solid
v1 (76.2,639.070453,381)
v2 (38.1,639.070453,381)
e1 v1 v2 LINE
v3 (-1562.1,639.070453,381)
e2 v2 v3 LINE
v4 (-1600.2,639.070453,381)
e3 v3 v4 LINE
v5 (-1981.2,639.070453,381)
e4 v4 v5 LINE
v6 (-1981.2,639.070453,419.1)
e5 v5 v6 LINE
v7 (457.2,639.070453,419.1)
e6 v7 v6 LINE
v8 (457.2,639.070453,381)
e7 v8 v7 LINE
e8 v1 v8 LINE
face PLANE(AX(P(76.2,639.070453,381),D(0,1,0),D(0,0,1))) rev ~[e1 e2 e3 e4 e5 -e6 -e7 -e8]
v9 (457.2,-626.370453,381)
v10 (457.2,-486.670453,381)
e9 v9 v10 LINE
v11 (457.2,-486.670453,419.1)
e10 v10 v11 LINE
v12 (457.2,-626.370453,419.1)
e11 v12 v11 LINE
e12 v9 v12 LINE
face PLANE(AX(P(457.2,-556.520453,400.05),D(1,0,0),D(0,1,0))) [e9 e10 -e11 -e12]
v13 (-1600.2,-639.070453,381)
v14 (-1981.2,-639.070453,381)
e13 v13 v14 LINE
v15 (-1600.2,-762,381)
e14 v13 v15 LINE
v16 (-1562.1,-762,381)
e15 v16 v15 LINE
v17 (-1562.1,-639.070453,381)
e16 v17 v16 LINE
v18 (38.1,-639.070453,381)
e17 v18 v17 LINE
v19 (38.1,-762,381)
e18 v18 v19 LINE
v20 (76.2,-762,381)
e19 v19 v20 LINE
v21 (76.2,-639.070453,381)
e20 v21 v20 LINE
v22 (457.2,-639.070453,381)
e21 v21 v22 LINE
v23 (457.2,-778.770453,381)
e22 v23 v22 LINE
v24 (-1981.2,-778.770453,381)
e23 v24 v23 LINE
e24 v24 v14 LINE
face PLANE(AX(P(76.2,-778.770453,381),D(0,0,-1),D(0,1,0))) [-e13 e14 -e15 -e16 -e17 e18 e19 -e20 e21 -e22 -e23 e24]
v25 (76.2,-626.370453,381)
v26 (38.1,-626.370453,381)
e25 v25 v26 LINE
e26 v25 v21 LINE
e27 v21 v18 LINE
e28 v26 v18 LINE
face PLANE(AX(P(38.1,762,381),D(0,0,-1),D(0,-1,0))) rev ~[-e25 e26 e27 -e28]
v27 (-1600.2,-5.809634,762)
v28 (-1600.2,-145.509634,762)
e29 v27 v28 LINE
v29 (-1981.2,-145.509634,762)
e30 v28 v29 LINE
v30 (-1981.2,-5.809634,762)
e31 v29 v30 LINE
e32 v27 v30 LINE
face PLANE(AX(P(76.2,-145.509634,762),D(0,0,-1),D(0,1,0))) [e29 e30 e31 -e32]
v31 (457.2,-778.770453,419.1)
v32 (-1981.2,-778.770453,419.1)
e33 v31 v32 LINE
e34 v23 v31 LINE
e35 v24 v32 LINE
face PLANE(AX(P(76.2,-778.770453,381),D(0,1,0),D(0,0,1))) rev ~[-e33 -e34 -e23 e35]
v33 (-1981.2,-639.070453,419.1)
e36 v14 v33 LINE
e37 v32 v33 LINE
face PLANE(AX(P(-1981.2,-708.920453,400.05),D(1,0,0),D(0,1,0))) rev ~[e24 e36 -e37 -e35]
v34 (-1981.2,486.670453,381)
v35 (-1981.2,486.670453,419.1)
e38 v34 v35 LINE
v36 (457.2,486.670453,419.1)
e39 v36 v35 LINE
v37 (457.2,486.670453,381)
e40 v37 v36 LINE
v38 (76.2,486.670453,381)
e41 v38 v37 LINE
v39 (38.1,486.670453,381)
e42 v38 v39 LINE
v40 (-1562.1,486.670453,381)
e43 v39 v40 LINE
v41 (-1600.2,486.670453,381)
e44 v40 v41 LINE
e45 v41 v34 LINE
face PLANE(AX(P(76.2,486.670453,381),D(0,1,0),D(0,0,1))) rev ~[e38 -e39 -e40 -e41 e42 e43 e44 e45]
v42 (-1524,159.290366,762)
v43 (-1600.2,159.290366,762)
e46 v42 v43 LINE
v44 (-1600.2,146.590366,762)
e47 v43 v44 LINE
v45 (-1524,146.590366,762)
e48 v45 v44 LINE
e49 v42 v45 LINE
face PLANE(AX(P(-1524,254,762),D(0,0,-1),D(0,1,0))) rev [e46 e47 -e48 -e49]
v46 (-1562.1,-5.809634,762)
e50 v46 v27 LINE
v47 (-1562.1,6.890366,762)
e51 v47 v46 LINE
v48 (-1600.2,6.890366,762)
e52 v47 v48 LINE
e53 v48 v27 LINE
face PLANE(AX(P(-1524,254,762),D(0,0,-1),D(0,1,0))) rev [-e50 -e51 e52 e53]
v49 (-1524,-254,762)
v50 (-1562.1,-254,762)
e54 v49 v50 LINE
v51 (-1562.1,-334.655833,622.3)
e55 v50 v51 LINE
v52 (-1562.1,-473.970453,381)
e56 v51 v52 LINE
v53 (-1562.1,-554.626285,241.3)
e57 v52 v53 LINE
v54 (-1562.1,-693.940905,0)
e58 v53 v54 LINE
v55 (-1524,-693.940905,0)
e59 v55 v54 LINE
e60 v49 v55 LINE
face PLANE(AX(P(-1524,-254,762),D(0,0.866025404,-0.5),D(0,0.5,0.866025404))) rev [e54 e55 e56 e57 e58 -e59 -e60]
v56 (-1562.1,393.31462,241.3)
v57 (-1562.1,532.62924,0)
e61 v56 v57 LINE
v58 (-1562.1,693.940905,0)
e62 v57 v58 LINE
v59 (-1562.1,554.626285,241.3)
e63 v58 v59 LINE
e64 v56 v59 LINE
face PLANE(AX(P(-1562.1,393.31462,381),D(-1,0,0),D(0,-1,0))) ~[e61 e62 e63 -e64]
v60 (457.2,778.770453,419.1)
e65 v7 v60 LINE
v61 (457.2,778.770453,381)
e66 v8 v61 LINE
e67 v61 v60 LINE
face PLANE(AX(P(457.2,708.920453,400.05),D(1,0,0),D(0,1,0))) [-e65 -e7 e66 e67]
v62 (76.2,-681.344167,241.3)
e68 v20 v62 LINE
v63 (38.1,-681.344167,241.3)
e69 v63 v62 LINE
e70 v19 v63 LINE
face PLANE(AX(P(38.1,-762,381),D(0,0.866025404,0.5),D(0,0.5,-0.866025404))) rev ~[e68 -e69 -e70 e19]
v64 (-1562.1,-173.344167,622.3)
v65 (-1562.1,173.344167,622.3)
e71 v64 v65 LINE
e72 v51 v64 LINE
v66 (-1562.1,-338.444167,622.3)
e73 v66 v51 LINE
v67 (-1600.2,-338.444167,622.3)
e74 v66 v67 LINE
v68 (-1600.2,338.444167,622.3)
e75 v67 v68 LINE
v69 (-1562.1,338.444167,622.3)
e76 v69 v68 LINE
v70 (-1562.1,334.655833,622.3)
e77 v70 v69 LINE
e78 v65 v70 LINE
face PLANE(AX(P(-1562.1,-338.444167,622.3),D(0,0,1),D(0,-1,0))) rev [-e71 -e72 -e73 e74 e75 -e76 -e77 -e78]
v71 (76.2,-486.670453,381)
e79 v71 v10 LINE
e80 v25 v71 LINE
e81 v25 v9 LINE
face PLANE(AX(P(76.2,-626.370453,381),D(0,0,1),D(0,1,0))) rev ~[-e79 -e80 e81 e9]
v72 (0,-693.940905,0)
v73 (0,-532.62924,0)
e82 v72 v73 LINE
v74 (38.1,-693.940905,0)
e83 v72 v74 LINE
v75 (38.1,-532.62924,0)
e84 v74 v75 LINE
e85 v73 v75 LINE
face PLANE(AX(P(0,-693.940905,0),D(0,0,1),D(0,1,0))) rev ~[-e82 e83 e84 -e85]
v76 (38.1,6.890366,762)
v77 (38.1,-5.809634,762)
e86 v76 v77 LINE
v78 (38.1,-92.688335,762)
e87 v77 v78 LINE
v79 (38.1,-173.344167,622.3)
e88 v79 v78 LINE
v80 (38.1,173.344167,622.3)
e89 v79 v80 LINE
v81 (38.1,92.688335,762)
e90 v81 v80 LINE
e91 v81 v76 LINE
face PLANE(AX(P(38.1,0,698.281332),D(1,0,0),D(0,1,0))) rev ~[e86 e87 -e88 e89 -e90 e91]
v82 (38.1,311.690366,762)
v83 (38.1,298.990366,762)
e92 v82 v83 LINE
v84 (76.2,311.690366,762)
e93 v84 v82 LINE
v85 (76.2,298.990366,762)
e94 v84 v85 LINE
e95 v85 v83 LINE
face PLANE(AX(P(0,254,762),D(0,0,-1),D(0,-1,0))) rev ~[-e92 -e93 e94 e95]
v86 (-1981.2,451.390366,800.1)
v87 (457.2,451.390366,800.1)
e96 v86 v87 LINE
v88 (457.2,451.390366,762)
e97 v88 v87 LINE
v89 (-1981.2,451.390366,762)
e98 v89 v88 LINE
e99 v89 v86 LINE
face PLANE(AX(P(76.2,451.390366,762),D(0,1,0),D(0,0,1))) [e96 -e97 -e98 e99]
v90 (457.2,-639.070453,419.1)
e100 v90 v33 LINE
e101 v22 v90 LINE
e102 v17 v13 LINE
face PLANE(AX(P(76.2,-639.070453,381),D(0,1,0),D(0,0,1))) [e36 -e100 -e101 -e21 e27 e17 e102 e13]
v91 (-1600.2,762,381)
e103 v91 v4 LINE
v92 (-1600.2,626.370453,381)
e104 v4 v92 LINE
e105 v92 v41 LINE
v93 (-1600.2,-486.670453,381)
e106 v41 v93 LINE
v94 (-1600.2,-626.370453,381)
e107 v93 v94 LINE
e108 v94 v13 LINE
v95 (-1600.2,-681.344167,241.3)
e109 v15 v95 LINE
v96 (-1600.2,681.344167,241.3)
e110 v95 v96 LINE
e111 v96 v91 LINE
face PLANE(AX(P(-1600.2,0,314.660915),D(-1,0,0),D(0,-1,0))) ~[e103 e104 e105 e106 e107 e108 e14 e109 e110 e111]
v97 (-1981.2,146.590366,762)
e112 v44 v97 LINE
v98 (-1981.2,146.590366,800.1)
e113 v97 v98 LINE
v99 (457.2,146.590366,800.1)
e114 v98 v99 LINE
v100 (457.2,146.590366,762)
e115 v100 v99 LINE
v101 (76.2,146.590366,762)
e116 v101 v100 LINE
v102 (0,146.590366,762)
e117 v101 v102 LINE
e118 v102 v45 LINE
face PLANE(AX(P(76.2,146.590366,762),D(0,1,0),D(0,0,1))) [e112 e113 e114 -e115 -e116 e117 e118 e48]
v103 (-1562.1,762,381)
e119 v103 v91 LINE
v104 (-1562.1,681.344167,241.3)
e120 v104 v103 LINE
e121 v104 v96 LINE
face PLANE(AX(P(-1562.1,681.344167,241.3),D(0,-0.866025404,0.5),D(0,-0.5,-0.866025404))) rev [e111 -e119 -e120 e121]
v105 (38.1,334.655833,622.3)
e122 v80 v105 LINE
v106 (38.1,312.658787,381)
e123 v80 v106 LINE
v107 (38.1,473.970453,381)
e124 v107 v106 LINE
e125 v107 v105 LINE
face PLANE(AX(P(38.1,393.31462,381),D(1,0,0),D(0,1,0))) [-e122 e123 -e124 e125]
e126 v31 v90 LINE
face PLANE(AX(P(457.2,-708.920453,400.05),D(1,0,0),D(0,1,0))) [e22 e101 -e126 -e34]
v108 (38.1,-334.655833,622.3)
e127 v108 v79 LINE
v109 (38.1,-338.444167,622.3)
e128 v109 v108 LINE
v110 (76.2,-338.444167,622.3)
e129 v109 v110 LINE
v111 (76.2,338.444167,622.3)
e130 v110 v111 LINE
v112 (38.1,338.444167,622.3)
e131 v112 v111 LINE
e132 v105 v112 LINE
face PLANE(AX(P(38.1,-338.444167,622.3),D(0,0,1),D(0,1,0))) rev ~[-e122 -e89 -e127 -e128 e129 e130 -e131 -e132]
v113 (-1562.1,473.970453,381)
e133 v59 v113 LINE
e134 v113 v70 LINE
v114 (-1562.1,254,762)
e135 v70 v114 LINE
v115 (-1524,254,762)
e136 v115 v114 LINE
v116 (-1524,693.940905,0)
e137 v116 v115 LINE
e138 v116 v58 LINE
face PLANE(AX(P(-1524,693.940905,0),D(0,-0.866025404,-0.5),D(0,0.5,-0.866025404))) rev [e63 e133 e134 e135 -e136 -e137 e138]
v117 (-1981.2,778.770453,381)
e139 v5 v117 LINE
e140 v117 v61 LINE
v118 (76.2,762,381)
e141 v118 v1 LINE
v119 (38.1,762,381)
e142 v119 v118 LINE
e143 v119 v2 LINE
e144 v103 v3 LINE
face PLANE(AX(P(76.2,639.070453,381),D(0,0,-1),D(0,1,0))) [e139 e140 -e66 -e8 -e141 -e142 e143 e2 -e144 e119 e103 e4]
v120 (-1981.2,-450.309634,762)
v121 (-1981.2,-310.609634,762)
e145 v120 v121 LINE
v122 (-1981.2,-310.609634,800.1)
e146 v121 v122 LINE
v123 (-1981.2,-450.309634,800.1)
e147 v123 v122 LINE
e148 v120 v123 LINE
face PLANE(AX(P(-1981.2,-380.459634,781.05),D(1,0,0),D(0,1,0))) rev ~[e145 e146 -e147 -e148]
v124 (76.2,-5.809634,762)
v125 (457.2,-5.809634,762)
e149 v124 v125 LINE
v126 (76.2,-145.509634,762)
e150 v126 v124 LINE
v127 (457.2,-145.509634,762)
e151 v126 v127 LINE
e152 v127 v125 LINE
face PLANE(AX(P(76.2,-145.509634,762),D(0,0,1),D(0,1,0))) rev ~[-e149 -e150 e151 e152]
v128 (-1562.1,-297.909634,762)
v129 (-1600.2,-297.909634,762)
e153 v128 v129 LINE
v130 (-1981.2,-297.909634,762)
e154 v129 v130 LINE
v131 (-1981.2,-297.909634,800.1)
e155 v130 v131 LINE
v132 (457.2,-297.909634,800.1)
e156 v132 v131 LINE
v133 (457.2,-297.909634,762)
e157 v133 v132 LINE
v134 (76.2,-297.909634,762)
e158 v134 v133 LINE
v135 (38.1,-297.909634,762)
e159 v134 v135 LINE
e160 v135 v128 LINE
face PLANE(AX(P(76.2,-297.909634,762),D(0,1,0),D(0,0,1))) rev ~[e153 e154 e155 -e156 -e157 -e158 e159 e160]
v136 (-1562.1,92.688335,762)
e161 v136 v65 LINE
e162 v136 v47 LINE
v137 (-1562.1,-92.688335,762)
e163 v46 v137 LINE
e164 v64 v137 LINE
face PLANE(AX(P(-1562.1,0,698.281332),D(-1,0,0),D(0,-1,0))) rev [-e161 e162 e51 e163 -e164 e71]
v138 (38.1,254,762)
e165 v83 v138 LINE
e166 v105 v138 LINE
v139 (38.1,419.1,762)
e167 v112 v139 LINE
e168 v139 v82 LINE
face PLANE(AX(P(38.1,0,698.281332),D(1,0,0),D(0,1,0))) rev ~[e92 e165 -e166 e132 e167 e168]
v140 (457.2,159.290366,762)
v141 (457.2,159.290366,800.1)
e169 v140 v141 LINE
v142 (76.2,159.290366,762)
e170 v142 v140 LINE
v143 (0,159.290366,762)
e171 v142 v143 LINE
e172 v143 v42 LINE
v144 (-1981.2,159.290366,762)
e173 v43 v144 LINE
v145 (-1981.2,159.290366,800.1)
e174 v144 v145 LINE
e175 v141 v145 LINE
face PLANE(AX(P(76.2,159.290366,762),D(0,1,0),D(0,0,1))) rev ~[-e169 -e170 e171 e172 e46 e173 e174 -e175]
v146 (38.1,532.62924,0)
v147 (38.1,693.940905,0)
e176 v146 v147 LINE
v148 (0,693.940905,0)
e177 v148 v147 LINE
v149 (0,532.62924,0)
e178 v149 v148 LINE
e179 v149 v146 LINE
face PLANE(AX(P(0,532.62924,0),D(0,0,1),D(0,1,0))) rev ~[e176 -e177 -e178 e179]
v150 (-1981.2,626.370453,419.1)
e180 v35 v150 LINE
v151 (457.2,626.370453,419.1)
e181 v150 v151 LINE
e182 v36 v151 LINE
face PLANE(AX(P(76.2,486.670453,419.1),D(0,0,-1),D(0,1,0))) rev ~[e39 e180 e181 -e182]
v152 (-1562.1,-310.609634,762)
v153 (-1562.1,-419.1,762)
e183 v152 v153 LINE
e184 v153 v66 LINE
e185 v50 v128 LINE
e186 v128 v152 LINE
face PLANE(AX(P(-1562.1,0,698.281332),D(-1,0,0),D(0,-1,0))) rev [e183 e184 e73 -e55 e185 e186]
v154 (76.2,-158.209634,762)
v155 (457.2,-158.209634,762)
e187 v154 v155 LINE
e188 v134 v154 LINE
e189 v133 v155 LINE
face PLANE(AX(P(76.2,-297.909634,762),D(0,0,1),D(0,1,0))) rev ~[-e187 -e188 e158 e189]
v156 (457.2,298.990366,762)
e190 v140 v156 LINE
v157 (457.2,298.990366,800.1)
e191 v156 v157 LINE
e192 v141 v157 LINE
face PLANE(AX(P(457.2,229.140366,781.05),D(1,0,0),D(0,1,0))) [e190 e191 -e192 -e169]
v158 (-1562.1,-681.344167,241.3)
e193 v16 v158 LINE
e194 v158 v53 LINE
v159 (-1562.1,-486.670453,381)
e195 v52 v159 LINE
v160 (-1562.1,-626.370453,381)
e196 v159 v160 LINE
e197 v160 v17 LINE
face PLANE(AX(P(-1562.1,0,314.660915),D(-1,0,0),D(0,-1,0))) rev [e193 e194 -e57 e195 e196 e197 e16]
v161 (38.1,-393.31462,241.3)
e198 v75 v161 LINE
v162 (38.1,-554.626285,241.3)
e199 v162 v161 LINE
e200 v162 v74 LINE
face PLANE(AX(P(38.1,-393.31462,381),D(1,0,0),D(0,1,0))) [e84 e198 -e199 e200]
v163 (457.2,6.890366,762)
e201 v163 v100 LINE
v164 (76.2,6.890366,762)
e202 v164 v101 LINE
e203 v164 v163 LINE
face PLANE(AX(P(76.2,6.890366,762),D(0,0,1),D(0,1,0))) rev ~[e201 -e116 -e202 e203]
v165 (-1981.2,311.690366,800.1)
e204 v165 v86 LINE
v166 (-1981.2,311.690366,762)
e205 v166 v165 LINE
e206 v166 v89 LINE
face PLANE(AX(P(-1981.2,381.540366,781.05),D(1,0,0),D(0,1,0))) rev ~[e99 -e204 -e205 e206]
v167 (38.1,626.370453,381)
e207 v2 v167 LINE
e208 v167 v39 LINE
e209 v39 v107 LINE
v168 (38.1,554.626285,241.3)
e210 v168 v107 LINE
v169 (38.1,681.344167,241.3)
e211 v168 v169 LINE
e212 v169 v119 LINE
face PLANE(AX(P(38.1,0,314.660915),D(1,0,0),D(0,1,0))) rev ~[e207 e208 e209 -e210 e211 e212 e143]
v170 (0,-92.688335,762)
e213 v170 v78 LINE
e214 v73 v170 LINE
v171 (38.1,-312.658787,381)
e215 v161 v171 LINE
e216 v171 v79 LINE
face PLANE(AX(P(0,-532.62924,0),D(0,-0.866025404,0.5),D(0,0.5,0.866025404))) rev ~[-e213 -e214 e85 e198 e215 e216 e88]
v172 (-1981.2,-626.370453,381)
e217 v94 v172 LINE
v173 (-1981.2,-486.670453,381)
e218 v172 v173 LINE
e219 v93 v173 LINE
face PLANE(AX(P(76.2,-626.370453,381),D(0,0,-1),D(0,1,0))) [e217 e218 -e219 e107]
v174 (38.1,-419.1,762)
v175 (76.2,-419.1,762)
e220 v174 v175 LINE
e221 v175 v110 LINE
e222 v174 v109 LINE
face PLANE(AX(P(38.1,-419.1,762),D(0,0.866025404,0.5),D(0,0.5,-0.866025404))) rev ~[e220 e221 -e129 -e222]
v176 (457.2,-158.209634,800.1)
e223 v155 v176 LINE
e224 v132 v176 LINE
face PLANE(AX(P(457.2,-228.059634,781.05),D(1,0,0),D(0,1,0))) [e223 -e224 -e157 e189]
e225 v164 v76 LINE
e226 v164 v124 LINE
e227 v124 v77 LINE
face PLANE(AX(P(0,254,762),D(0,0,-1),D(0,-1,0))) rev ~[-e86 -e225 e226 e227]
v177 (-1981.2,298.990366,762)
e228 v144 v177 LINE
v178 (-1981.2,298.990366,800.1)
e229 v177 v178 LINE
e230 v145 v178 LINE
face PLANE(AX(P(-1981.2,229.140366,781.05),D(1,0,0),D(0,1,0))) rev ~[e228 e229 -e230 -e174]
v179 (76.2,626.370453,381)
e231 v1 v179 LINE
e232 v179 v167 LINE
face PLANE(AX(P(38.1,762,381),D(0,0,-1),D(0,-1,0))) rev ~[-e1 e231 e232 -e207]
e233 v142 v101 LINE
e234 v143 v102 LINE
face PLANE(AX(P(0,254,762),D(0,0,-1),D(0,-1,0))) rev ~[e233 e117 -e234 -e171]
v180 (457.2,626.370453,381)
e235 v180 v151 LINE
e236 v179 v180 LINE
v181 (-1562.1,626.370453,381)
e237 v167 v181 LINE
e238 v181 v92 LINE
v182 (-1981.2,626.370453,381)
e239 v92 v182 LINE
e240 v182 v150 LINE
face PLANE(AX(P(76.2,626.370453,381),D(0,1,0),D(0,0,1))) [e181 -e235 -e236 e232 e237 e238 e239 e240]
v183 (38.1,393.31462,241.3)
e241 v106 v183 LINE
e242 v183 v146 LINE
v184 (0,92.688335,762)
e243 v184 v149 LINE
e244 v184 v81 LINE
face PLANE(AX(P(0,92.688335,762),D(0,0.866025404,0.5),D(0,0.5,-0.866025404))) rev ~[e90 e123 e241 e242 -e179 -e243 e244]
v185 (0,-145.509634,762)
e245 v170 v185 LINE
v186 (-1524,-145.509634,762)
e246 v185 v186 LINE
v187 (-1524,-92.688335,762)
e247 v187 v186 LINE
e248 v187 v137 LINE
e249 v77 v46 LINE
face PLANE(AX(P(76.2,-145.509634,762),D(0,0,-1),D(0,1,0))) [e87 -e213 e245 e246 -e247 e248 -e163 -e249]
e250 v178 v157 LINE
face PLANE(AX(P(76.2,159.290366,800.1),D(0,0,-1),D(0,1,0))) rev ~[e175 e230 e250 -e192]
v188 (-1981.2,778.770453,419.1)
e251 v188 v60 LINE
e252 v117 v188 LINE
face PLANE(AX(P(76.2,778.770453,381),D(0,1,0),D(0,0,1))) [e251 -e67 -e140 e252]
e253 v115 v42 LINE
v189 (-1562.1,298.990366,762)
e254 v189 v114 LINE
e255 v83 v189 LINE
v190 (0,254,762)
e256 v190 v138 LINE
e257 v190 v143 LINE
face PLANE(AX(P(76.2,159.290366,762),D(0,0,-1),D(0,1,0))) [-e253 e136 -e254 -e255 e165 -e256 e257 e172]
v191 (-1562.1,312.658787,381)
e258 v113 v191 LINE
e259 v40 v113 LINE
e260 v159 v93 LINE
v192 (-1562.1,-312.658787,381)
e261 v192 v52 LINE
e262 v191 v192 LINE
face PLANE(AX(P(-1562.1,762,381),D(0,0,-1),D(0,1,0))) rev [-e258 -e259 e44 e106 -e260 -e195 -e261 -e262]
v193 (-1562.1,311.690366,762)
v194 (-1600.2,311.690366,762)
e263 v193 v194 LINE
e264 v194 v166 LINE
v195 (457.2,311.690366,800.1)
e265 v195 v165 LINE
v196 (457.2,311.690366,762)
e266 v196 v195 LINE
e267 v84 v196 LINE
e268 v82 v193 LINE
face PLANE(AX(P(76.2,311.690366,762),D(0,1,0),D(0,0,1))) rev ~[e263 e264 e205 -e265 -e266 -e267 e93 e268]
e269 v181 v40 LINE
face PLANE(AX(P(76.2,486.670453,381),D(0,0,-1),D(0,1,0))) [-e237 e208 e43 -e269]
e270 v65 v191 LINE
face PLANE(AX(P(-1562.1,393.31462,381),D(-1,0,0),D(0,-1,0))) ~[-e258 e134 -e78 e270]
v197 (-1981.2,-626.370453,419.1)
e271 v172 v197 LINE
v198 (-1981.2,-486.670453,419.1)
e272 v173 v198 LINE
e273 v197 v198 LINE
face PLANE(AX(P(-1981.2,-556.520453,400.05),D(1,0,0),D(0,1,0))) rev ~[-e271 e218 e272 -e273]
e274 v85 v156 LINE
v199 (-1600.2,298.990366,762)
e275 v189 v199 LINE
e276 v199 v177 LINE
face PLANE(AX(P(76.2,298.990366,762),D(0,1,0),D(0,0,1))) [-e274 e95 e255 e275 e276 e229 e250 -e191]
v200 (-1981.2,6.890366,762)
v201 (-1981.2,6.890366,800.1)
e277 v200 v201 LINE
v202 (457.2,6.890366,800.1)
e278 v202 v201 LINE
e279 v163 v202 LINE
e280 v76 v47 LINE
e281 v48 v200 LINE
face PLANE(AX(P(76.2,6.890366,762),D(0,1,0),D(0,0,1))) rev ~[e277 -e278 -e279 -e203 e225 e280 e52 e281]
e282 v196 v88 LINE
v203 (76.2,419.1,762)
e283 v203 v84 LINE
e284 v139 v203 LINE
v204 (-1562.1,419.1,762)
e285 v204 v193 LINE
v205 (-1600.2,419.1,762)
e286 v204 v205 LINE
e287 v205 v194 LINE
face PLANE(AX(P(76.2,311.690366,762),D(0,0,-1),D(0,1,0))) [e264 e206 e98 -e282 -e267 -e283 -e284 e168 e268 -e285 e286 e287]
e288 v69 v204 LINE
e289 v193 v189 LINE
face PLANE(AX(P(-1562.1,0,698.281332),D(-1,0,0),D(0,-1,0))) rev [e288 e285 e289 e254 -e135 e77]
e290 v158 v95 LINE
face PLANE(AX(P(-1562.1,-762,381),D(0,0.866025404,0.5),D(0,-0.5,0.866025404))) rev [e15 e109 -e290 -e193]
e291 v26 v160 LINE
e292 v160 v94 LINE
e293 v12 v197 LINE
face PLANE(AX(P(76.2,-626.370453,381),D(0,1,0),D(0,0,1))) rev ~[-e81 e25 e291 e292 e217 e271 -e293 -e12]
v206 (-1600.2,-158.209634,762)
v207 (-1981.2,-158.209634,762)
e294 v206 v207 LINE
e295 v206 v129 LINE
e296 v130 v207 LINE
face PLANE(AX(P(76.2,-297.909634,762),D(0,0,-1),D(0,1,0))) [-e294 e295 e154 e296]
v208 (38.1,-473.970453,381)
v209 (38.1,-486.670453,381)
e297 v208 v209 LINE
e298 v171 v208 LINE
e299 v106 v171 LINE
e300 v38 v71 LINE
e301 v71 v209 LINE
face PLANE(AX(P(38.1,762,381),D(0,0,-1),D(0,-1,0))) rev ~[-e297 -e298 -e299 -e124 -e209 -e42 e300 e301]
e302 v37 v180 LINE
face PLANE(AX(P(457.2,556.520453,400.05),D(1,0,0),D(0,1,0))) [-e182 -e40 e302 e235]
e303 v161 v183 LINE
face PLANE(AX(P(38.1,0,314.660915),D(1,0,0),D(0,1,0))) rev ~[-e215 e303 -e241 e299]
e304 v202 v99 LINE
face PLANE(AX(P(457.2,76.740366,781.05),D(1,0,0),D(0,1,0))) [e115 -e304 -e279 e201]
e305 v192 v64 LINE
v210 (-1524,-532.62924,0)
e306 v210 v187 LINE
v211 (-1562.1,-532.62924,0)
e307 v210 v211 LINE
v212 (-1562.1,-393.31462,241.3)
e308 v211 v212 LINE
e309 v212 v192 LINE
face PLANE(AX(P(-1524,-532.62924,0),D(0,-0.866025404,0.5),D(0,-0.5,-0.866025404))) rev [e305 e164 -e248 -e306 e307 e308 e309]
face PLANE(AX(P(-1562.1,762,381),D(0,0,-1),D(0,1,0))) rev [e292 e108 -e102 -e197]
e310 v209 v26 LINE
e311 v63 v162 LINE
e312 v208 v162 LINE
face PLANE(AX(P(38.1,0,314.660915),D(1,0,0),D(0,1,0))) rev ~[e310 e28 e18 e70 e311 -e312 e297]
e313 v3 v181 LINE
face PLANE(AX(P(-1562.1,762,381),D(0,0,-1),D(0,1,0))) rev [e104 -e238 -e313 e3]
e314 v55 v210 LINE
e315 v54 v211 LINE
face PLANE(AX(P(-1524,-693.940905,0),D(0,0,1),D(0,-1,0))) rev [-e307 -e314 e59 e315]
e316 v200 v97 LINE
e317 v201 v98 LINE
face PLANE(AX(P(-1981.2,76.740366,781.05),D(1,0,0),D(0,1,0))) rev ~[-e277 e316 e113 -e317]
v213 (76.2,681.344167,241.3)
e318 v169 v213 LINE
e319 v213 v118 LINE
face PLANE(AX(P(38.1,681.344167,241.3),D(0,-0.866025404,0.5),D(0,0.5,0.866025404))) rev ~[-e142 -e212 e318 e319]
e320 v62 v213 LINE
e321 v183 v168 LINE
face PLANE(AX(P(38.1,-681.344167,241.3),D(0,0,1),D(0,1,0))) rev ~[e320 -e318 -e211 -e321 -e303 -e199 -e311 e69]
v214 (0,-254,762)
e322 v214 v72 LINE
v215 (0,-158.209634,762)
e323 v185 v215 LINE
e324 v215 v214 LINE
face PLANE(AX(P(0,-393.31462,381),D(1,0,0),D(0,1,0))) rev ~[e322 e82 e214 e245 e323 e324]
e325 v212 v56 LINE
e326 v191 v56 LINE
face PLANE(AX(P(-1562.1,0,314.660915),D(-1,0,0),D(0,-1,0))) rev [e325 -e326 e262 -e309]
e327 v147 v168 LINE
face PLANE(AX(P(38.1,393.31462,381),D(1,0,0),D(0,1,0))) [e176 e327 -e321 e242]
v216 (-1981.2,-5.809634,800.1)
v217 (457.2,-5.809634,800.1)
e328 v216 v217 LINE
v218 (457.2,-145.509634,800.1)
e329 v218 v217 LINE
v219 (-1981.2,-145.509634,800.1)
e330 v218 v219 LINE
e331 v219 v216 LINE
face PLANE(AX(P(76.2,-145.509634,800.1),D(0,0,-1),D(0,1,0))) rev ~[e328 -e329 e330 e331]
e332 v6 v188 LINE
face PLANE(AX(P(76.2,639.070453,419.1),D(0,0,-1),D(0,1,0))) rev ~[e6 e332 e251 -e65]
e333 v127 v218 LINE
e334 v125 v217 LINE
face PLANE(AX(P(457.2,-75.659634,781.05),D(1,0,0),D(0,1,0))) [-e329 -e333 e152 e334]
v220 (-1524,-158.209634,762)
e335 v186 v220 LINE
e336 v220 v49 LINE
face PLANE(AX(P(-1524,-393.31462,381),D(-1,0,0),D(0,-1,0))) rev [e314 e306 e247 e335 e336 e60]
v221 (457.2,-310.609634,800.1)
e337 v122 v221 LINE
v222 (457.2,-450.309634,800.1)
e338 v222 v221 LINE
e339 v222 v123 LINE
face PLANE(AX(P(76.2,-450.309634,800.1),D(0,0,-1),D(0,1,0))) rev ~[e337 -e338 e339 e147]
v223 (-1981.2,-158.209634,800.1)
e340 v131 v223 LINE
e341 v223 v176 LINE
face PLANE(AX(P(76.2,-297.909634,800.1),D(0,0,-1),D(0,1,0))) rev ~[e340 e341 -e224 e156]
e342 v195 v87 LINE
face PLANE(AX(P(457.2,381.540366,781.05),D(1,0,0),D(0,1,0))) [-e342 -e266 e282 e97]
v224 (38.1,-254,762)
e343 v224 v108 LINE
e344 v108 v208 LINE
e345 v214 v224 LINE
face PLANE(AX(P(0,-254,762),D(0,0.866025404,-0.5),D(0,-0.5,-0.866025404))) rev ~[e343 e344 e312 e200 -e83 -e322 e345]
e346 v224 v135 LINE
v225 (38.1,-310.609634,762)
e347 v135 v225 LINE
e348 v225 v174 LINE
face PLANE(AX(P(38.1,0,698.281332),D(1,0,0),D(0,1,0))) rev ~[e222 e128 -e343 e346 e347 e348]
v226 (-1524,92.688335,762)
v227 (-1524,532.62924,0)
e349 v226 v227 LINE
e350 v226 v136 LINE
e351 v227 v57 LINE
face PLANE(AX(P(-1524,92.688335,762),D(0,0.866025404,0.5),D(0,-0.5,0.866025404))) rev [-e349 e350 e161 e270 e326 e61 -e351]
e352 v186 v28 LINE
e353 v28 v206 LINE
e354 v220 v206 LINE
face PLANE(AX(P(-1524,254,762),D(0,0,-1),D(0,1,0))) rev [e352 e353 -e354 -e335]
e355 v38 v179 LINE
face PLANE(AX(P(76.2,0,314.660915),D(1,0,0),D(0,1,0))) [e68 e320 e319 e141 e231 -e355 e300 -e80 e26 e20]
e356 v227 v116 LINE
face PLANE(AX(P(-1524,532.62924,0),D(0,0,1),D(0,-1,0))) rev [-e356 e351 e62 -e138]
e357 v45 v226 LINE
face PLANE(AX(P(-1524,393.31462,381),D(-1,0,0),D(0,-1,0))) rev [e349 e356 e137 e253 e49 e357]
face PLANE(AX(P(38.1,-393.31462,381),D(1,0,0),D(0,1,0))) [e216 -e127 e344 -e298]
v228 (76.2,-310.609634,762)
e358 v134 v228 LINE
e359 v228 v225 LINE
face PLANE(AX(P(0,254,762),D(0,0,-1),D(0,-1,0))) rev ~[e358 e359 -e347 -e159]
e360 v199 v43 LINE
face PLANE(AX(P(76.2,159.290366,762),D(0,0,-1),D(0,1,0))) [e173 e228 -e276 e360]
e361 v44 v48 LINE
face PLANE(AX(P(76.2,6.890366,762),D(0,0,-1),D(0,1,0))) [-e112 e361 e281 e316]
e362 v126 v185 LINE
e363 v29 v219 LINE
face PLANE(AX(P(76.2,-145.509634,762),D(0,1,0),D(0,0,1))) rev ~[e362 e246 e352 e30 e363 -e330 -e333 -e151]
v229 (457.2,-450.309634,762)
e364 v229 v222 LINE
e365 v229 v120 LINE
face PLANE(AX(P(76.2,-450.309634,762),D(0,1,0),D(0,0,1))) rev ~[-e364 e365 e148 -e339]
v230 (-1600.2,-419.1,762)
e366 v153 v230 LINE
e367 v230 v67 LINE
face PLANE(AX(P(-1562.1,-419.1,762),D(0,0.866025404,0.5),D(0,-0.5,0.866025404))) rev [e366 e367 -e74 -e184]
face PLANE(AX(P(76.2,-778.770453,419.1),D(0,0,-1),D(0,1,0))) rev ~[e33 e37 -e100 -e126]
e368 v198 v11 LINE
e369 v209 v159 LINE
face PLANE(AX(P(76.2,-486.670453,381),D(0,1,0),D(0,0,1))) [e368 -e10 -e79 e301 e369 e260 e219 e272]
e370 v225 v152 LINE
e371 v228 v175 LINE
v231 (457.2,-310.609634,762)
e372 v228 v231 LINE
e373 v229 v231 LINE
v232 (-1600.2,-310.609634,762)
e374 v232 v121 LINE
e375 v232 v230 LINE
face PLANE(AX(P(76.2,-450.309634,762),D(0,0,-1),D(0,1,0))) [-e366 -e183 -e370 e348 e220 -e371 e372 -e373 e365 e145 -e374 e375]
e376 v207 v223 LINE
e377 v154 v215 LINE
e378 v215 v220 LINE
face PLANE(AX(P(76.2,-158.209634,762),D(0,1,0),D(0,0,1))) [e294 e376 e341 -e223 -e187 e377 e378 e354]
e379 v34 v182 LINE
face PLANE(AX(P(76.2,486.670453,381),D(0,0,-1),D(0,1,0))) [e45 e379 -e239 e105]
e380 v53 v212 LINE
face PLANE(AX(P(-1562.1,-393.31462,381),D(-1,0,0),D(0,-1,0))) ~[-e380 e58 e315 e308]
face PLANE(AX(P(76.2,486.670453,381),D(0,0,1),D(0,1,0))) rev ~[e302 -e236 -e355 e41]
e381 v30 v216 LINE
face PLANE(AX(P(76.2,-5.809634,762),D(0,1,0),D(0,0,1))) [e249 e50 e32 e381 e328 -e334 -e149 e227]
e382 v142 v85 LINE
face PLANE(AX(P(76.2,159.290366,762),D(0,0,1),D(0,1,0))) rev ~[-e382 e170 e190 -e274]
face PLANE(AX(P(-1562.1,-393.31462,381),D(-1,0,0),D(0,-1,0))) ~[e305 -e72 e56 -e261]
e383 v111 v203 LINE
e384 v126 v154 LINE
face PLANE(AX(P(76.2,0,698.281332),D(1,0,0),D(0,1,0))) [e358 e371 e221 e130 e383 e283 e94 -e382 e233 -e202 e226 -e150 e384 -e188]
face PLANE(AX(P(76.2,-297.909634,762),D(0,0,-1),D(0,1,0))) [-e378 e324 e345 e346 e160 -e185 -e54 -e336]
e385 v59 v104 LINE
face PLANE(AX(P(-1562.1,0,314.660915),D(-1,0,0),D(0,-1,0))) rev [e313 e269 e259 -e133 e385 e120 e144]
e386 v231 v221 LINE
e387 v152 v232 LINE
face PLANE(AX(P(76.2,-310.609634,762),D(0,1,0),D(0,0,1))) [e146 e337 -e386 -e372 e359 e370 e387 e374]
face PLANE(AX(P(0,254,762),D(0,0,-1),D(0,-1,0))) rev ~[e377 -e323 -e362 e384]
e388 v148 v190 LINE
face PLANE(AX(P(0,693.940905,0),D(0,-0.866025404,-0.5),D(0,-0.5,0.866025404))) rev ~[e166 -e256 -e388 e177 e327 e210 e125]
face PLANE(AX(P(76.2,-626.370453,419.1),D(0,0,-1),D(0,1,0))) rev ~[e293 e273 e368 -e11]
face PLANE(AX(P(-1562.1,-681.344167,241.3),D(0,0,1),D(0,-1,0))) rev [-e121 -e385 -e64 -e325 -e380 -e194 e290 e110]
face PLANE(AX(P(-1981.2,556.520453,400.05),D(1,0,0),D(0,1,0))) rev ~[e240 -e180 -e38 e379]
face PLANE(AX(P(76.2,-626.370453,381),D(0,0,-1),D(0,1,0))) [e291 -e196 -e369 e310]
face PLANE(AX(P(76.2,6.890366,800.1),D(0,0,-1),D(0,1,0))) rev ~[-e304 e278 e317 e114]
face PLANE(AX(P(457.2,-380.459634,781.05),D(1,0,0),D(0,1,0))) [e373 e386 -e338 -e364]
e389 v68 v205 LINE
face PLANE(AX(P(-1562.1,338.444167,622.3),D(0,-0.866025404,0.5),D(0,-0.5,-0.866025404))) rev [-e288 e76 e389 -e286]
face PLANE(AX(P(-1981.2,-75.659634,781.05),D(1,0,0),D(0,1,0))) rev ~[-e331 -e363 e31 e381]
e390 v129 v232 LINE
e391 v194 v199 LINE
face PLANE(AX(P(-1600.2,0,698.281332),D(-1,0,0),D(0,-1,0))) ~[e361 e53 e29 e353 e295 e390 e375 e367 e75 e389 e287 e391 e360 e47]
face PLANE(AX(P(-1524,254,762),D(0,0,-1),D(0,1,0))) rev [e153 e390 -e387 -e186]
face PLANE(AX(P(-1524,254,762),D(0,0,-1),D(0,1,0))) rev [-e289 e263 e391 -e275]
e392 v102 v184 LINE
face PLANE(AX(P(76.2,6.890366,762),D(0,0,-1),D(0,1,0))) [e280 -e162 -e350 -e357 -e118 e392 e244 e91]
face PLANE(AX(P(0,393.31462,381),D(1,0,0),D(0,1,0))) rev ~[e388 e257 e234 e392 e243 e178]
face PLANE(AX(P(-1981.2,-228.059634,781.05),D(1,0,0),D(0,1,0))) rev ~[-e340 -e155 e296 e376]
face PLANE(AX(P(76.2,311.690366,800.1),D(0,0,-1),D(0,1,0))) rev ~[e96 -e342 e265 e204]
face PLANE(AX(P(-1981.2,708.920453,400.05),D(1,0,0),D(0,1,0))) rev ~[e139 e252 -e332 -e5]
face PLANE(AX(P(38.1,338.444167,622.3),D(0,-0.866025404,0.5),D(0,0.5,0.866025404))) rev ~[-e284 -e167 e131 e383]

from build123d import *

# Parameters (mm, degrees)
F1_DEPTH      = 38.1
F3_DEPTH      = 38.1
F4_W          = 139.7
F4_H          = 38.1
F5_DEPTH      = 381
F5_DEPTH_BACK = 2057.4


# Not quite as in the source:
# - a pattern or mirror of a feature is missing from the dataset's text; its kind, count and spacing are read off the source's solid


with BuildPart() as f1:
    # F0 (on Right) → F1 (new body)
    with BuildSketch(Plane.YZ):
        Polygon((-254, 762), (-693.9409051225, 0), (-532.6292399109, 0), (-92.6883347884, 762), align=None)
    extrude(amount=F1_DEPTH)


with BuildPart() as f1b:
    # F0 (on Right) → F1, piece 2 (new body)
    with BuildSketch(Plane.YZ):
        Polygon((254, 762), (92.6883347884, 762), (532.6292399109, 0), (693.9409051225, 0), align=None)
    extrude(amount=F1_DEPTH)


with BuildPart() as f1_copies_1:
    # F1_copies: instance of F1
    add(f1.part.mirror(Plane(origin=(-762, 0, 0), x_dir=(0, 0, -1), z_dir=(-1, 0, 0))))


with BuildPart() as f1_2_copies_1:
    # F1_2_copies: instance of F1b
    add(f1b.part.mirror(Plane(origin=(-762, 0, 0), x_dir=(0, 0, -1), z_dir=(-1, 0, 0))))


with BuildPart() as f1_1:
    add(f1.part)

    add(f1b.part)  # F3 merges F1b
    # F2 (on face) → F3 (join)
    with BuildSketch(Plane.YZ.offset(38.1)):
        Polygon((762, 381), (-762, 381), (-681.3441673942, 241.3), (681.3441673942, 241.3), align=None)
        Polygon((419.1, 762), (-419.1, 762), (-338.4441673942, 622.3), (338.4441673942, 622.3), align=None)
    f3 = extrude(amount=F3_DEPTH)

    # F3_copies: F3 across plane
    add(f3.mirror(Plane(origin=(-762, 0, 0), x_dir=(0, 0, -1), z_dir=(-1, 0, 0))))

    add(f1_copies_1.part)  # F5 merges F1_copies_1

    add(f1_2_copies_1.part)  # F5 merges F1_2_copies_1
    # F4 (on face) → F5 (join, two sides)
    with BuildSketch(Plane.YZ.offset(76.2)) as f5_sk:
        with Locations((-708.9204525612, 400.05)):
            Rectangle(F4_W, F4_H)
        with Locations((-556.5204525612, 400.05)):
            Rectangle(F4_W, F4_H)
        with Locations((556.5204525612, 400.05)):
            Rectangle(F4_W, F4_H)
        with Locations((708.9204525612, 400.05)):
            Rectangle(F4_W, F4_H)
        with Locations((-380.4596342087, 781.05)):
            Rectangle(F4_W, F4_H)
        with Locations((-228.0596342087, 781.05)):
            Rectangle(F4_W, F4_H)
        with Locations((-75.6596342087, 781.05)):
            Rectangle(F4_W, F4_H)
        with Locations((76.7403657913, 781.05)):
            Rectangle(F4_W, F4_H)
        with Locations((229.1403657913, 781.05)):
            Rectangle(F4_W, F4_H)
        with Locations((381.5403657913, 781.05)):
            Rectangle(F4_W, F4_H)
    extrude(amount=F5_DEPTH)
    extrude(f5_sk.sketch, amount=-F5_DEPTH_BACK)


solid = f1_1.part
